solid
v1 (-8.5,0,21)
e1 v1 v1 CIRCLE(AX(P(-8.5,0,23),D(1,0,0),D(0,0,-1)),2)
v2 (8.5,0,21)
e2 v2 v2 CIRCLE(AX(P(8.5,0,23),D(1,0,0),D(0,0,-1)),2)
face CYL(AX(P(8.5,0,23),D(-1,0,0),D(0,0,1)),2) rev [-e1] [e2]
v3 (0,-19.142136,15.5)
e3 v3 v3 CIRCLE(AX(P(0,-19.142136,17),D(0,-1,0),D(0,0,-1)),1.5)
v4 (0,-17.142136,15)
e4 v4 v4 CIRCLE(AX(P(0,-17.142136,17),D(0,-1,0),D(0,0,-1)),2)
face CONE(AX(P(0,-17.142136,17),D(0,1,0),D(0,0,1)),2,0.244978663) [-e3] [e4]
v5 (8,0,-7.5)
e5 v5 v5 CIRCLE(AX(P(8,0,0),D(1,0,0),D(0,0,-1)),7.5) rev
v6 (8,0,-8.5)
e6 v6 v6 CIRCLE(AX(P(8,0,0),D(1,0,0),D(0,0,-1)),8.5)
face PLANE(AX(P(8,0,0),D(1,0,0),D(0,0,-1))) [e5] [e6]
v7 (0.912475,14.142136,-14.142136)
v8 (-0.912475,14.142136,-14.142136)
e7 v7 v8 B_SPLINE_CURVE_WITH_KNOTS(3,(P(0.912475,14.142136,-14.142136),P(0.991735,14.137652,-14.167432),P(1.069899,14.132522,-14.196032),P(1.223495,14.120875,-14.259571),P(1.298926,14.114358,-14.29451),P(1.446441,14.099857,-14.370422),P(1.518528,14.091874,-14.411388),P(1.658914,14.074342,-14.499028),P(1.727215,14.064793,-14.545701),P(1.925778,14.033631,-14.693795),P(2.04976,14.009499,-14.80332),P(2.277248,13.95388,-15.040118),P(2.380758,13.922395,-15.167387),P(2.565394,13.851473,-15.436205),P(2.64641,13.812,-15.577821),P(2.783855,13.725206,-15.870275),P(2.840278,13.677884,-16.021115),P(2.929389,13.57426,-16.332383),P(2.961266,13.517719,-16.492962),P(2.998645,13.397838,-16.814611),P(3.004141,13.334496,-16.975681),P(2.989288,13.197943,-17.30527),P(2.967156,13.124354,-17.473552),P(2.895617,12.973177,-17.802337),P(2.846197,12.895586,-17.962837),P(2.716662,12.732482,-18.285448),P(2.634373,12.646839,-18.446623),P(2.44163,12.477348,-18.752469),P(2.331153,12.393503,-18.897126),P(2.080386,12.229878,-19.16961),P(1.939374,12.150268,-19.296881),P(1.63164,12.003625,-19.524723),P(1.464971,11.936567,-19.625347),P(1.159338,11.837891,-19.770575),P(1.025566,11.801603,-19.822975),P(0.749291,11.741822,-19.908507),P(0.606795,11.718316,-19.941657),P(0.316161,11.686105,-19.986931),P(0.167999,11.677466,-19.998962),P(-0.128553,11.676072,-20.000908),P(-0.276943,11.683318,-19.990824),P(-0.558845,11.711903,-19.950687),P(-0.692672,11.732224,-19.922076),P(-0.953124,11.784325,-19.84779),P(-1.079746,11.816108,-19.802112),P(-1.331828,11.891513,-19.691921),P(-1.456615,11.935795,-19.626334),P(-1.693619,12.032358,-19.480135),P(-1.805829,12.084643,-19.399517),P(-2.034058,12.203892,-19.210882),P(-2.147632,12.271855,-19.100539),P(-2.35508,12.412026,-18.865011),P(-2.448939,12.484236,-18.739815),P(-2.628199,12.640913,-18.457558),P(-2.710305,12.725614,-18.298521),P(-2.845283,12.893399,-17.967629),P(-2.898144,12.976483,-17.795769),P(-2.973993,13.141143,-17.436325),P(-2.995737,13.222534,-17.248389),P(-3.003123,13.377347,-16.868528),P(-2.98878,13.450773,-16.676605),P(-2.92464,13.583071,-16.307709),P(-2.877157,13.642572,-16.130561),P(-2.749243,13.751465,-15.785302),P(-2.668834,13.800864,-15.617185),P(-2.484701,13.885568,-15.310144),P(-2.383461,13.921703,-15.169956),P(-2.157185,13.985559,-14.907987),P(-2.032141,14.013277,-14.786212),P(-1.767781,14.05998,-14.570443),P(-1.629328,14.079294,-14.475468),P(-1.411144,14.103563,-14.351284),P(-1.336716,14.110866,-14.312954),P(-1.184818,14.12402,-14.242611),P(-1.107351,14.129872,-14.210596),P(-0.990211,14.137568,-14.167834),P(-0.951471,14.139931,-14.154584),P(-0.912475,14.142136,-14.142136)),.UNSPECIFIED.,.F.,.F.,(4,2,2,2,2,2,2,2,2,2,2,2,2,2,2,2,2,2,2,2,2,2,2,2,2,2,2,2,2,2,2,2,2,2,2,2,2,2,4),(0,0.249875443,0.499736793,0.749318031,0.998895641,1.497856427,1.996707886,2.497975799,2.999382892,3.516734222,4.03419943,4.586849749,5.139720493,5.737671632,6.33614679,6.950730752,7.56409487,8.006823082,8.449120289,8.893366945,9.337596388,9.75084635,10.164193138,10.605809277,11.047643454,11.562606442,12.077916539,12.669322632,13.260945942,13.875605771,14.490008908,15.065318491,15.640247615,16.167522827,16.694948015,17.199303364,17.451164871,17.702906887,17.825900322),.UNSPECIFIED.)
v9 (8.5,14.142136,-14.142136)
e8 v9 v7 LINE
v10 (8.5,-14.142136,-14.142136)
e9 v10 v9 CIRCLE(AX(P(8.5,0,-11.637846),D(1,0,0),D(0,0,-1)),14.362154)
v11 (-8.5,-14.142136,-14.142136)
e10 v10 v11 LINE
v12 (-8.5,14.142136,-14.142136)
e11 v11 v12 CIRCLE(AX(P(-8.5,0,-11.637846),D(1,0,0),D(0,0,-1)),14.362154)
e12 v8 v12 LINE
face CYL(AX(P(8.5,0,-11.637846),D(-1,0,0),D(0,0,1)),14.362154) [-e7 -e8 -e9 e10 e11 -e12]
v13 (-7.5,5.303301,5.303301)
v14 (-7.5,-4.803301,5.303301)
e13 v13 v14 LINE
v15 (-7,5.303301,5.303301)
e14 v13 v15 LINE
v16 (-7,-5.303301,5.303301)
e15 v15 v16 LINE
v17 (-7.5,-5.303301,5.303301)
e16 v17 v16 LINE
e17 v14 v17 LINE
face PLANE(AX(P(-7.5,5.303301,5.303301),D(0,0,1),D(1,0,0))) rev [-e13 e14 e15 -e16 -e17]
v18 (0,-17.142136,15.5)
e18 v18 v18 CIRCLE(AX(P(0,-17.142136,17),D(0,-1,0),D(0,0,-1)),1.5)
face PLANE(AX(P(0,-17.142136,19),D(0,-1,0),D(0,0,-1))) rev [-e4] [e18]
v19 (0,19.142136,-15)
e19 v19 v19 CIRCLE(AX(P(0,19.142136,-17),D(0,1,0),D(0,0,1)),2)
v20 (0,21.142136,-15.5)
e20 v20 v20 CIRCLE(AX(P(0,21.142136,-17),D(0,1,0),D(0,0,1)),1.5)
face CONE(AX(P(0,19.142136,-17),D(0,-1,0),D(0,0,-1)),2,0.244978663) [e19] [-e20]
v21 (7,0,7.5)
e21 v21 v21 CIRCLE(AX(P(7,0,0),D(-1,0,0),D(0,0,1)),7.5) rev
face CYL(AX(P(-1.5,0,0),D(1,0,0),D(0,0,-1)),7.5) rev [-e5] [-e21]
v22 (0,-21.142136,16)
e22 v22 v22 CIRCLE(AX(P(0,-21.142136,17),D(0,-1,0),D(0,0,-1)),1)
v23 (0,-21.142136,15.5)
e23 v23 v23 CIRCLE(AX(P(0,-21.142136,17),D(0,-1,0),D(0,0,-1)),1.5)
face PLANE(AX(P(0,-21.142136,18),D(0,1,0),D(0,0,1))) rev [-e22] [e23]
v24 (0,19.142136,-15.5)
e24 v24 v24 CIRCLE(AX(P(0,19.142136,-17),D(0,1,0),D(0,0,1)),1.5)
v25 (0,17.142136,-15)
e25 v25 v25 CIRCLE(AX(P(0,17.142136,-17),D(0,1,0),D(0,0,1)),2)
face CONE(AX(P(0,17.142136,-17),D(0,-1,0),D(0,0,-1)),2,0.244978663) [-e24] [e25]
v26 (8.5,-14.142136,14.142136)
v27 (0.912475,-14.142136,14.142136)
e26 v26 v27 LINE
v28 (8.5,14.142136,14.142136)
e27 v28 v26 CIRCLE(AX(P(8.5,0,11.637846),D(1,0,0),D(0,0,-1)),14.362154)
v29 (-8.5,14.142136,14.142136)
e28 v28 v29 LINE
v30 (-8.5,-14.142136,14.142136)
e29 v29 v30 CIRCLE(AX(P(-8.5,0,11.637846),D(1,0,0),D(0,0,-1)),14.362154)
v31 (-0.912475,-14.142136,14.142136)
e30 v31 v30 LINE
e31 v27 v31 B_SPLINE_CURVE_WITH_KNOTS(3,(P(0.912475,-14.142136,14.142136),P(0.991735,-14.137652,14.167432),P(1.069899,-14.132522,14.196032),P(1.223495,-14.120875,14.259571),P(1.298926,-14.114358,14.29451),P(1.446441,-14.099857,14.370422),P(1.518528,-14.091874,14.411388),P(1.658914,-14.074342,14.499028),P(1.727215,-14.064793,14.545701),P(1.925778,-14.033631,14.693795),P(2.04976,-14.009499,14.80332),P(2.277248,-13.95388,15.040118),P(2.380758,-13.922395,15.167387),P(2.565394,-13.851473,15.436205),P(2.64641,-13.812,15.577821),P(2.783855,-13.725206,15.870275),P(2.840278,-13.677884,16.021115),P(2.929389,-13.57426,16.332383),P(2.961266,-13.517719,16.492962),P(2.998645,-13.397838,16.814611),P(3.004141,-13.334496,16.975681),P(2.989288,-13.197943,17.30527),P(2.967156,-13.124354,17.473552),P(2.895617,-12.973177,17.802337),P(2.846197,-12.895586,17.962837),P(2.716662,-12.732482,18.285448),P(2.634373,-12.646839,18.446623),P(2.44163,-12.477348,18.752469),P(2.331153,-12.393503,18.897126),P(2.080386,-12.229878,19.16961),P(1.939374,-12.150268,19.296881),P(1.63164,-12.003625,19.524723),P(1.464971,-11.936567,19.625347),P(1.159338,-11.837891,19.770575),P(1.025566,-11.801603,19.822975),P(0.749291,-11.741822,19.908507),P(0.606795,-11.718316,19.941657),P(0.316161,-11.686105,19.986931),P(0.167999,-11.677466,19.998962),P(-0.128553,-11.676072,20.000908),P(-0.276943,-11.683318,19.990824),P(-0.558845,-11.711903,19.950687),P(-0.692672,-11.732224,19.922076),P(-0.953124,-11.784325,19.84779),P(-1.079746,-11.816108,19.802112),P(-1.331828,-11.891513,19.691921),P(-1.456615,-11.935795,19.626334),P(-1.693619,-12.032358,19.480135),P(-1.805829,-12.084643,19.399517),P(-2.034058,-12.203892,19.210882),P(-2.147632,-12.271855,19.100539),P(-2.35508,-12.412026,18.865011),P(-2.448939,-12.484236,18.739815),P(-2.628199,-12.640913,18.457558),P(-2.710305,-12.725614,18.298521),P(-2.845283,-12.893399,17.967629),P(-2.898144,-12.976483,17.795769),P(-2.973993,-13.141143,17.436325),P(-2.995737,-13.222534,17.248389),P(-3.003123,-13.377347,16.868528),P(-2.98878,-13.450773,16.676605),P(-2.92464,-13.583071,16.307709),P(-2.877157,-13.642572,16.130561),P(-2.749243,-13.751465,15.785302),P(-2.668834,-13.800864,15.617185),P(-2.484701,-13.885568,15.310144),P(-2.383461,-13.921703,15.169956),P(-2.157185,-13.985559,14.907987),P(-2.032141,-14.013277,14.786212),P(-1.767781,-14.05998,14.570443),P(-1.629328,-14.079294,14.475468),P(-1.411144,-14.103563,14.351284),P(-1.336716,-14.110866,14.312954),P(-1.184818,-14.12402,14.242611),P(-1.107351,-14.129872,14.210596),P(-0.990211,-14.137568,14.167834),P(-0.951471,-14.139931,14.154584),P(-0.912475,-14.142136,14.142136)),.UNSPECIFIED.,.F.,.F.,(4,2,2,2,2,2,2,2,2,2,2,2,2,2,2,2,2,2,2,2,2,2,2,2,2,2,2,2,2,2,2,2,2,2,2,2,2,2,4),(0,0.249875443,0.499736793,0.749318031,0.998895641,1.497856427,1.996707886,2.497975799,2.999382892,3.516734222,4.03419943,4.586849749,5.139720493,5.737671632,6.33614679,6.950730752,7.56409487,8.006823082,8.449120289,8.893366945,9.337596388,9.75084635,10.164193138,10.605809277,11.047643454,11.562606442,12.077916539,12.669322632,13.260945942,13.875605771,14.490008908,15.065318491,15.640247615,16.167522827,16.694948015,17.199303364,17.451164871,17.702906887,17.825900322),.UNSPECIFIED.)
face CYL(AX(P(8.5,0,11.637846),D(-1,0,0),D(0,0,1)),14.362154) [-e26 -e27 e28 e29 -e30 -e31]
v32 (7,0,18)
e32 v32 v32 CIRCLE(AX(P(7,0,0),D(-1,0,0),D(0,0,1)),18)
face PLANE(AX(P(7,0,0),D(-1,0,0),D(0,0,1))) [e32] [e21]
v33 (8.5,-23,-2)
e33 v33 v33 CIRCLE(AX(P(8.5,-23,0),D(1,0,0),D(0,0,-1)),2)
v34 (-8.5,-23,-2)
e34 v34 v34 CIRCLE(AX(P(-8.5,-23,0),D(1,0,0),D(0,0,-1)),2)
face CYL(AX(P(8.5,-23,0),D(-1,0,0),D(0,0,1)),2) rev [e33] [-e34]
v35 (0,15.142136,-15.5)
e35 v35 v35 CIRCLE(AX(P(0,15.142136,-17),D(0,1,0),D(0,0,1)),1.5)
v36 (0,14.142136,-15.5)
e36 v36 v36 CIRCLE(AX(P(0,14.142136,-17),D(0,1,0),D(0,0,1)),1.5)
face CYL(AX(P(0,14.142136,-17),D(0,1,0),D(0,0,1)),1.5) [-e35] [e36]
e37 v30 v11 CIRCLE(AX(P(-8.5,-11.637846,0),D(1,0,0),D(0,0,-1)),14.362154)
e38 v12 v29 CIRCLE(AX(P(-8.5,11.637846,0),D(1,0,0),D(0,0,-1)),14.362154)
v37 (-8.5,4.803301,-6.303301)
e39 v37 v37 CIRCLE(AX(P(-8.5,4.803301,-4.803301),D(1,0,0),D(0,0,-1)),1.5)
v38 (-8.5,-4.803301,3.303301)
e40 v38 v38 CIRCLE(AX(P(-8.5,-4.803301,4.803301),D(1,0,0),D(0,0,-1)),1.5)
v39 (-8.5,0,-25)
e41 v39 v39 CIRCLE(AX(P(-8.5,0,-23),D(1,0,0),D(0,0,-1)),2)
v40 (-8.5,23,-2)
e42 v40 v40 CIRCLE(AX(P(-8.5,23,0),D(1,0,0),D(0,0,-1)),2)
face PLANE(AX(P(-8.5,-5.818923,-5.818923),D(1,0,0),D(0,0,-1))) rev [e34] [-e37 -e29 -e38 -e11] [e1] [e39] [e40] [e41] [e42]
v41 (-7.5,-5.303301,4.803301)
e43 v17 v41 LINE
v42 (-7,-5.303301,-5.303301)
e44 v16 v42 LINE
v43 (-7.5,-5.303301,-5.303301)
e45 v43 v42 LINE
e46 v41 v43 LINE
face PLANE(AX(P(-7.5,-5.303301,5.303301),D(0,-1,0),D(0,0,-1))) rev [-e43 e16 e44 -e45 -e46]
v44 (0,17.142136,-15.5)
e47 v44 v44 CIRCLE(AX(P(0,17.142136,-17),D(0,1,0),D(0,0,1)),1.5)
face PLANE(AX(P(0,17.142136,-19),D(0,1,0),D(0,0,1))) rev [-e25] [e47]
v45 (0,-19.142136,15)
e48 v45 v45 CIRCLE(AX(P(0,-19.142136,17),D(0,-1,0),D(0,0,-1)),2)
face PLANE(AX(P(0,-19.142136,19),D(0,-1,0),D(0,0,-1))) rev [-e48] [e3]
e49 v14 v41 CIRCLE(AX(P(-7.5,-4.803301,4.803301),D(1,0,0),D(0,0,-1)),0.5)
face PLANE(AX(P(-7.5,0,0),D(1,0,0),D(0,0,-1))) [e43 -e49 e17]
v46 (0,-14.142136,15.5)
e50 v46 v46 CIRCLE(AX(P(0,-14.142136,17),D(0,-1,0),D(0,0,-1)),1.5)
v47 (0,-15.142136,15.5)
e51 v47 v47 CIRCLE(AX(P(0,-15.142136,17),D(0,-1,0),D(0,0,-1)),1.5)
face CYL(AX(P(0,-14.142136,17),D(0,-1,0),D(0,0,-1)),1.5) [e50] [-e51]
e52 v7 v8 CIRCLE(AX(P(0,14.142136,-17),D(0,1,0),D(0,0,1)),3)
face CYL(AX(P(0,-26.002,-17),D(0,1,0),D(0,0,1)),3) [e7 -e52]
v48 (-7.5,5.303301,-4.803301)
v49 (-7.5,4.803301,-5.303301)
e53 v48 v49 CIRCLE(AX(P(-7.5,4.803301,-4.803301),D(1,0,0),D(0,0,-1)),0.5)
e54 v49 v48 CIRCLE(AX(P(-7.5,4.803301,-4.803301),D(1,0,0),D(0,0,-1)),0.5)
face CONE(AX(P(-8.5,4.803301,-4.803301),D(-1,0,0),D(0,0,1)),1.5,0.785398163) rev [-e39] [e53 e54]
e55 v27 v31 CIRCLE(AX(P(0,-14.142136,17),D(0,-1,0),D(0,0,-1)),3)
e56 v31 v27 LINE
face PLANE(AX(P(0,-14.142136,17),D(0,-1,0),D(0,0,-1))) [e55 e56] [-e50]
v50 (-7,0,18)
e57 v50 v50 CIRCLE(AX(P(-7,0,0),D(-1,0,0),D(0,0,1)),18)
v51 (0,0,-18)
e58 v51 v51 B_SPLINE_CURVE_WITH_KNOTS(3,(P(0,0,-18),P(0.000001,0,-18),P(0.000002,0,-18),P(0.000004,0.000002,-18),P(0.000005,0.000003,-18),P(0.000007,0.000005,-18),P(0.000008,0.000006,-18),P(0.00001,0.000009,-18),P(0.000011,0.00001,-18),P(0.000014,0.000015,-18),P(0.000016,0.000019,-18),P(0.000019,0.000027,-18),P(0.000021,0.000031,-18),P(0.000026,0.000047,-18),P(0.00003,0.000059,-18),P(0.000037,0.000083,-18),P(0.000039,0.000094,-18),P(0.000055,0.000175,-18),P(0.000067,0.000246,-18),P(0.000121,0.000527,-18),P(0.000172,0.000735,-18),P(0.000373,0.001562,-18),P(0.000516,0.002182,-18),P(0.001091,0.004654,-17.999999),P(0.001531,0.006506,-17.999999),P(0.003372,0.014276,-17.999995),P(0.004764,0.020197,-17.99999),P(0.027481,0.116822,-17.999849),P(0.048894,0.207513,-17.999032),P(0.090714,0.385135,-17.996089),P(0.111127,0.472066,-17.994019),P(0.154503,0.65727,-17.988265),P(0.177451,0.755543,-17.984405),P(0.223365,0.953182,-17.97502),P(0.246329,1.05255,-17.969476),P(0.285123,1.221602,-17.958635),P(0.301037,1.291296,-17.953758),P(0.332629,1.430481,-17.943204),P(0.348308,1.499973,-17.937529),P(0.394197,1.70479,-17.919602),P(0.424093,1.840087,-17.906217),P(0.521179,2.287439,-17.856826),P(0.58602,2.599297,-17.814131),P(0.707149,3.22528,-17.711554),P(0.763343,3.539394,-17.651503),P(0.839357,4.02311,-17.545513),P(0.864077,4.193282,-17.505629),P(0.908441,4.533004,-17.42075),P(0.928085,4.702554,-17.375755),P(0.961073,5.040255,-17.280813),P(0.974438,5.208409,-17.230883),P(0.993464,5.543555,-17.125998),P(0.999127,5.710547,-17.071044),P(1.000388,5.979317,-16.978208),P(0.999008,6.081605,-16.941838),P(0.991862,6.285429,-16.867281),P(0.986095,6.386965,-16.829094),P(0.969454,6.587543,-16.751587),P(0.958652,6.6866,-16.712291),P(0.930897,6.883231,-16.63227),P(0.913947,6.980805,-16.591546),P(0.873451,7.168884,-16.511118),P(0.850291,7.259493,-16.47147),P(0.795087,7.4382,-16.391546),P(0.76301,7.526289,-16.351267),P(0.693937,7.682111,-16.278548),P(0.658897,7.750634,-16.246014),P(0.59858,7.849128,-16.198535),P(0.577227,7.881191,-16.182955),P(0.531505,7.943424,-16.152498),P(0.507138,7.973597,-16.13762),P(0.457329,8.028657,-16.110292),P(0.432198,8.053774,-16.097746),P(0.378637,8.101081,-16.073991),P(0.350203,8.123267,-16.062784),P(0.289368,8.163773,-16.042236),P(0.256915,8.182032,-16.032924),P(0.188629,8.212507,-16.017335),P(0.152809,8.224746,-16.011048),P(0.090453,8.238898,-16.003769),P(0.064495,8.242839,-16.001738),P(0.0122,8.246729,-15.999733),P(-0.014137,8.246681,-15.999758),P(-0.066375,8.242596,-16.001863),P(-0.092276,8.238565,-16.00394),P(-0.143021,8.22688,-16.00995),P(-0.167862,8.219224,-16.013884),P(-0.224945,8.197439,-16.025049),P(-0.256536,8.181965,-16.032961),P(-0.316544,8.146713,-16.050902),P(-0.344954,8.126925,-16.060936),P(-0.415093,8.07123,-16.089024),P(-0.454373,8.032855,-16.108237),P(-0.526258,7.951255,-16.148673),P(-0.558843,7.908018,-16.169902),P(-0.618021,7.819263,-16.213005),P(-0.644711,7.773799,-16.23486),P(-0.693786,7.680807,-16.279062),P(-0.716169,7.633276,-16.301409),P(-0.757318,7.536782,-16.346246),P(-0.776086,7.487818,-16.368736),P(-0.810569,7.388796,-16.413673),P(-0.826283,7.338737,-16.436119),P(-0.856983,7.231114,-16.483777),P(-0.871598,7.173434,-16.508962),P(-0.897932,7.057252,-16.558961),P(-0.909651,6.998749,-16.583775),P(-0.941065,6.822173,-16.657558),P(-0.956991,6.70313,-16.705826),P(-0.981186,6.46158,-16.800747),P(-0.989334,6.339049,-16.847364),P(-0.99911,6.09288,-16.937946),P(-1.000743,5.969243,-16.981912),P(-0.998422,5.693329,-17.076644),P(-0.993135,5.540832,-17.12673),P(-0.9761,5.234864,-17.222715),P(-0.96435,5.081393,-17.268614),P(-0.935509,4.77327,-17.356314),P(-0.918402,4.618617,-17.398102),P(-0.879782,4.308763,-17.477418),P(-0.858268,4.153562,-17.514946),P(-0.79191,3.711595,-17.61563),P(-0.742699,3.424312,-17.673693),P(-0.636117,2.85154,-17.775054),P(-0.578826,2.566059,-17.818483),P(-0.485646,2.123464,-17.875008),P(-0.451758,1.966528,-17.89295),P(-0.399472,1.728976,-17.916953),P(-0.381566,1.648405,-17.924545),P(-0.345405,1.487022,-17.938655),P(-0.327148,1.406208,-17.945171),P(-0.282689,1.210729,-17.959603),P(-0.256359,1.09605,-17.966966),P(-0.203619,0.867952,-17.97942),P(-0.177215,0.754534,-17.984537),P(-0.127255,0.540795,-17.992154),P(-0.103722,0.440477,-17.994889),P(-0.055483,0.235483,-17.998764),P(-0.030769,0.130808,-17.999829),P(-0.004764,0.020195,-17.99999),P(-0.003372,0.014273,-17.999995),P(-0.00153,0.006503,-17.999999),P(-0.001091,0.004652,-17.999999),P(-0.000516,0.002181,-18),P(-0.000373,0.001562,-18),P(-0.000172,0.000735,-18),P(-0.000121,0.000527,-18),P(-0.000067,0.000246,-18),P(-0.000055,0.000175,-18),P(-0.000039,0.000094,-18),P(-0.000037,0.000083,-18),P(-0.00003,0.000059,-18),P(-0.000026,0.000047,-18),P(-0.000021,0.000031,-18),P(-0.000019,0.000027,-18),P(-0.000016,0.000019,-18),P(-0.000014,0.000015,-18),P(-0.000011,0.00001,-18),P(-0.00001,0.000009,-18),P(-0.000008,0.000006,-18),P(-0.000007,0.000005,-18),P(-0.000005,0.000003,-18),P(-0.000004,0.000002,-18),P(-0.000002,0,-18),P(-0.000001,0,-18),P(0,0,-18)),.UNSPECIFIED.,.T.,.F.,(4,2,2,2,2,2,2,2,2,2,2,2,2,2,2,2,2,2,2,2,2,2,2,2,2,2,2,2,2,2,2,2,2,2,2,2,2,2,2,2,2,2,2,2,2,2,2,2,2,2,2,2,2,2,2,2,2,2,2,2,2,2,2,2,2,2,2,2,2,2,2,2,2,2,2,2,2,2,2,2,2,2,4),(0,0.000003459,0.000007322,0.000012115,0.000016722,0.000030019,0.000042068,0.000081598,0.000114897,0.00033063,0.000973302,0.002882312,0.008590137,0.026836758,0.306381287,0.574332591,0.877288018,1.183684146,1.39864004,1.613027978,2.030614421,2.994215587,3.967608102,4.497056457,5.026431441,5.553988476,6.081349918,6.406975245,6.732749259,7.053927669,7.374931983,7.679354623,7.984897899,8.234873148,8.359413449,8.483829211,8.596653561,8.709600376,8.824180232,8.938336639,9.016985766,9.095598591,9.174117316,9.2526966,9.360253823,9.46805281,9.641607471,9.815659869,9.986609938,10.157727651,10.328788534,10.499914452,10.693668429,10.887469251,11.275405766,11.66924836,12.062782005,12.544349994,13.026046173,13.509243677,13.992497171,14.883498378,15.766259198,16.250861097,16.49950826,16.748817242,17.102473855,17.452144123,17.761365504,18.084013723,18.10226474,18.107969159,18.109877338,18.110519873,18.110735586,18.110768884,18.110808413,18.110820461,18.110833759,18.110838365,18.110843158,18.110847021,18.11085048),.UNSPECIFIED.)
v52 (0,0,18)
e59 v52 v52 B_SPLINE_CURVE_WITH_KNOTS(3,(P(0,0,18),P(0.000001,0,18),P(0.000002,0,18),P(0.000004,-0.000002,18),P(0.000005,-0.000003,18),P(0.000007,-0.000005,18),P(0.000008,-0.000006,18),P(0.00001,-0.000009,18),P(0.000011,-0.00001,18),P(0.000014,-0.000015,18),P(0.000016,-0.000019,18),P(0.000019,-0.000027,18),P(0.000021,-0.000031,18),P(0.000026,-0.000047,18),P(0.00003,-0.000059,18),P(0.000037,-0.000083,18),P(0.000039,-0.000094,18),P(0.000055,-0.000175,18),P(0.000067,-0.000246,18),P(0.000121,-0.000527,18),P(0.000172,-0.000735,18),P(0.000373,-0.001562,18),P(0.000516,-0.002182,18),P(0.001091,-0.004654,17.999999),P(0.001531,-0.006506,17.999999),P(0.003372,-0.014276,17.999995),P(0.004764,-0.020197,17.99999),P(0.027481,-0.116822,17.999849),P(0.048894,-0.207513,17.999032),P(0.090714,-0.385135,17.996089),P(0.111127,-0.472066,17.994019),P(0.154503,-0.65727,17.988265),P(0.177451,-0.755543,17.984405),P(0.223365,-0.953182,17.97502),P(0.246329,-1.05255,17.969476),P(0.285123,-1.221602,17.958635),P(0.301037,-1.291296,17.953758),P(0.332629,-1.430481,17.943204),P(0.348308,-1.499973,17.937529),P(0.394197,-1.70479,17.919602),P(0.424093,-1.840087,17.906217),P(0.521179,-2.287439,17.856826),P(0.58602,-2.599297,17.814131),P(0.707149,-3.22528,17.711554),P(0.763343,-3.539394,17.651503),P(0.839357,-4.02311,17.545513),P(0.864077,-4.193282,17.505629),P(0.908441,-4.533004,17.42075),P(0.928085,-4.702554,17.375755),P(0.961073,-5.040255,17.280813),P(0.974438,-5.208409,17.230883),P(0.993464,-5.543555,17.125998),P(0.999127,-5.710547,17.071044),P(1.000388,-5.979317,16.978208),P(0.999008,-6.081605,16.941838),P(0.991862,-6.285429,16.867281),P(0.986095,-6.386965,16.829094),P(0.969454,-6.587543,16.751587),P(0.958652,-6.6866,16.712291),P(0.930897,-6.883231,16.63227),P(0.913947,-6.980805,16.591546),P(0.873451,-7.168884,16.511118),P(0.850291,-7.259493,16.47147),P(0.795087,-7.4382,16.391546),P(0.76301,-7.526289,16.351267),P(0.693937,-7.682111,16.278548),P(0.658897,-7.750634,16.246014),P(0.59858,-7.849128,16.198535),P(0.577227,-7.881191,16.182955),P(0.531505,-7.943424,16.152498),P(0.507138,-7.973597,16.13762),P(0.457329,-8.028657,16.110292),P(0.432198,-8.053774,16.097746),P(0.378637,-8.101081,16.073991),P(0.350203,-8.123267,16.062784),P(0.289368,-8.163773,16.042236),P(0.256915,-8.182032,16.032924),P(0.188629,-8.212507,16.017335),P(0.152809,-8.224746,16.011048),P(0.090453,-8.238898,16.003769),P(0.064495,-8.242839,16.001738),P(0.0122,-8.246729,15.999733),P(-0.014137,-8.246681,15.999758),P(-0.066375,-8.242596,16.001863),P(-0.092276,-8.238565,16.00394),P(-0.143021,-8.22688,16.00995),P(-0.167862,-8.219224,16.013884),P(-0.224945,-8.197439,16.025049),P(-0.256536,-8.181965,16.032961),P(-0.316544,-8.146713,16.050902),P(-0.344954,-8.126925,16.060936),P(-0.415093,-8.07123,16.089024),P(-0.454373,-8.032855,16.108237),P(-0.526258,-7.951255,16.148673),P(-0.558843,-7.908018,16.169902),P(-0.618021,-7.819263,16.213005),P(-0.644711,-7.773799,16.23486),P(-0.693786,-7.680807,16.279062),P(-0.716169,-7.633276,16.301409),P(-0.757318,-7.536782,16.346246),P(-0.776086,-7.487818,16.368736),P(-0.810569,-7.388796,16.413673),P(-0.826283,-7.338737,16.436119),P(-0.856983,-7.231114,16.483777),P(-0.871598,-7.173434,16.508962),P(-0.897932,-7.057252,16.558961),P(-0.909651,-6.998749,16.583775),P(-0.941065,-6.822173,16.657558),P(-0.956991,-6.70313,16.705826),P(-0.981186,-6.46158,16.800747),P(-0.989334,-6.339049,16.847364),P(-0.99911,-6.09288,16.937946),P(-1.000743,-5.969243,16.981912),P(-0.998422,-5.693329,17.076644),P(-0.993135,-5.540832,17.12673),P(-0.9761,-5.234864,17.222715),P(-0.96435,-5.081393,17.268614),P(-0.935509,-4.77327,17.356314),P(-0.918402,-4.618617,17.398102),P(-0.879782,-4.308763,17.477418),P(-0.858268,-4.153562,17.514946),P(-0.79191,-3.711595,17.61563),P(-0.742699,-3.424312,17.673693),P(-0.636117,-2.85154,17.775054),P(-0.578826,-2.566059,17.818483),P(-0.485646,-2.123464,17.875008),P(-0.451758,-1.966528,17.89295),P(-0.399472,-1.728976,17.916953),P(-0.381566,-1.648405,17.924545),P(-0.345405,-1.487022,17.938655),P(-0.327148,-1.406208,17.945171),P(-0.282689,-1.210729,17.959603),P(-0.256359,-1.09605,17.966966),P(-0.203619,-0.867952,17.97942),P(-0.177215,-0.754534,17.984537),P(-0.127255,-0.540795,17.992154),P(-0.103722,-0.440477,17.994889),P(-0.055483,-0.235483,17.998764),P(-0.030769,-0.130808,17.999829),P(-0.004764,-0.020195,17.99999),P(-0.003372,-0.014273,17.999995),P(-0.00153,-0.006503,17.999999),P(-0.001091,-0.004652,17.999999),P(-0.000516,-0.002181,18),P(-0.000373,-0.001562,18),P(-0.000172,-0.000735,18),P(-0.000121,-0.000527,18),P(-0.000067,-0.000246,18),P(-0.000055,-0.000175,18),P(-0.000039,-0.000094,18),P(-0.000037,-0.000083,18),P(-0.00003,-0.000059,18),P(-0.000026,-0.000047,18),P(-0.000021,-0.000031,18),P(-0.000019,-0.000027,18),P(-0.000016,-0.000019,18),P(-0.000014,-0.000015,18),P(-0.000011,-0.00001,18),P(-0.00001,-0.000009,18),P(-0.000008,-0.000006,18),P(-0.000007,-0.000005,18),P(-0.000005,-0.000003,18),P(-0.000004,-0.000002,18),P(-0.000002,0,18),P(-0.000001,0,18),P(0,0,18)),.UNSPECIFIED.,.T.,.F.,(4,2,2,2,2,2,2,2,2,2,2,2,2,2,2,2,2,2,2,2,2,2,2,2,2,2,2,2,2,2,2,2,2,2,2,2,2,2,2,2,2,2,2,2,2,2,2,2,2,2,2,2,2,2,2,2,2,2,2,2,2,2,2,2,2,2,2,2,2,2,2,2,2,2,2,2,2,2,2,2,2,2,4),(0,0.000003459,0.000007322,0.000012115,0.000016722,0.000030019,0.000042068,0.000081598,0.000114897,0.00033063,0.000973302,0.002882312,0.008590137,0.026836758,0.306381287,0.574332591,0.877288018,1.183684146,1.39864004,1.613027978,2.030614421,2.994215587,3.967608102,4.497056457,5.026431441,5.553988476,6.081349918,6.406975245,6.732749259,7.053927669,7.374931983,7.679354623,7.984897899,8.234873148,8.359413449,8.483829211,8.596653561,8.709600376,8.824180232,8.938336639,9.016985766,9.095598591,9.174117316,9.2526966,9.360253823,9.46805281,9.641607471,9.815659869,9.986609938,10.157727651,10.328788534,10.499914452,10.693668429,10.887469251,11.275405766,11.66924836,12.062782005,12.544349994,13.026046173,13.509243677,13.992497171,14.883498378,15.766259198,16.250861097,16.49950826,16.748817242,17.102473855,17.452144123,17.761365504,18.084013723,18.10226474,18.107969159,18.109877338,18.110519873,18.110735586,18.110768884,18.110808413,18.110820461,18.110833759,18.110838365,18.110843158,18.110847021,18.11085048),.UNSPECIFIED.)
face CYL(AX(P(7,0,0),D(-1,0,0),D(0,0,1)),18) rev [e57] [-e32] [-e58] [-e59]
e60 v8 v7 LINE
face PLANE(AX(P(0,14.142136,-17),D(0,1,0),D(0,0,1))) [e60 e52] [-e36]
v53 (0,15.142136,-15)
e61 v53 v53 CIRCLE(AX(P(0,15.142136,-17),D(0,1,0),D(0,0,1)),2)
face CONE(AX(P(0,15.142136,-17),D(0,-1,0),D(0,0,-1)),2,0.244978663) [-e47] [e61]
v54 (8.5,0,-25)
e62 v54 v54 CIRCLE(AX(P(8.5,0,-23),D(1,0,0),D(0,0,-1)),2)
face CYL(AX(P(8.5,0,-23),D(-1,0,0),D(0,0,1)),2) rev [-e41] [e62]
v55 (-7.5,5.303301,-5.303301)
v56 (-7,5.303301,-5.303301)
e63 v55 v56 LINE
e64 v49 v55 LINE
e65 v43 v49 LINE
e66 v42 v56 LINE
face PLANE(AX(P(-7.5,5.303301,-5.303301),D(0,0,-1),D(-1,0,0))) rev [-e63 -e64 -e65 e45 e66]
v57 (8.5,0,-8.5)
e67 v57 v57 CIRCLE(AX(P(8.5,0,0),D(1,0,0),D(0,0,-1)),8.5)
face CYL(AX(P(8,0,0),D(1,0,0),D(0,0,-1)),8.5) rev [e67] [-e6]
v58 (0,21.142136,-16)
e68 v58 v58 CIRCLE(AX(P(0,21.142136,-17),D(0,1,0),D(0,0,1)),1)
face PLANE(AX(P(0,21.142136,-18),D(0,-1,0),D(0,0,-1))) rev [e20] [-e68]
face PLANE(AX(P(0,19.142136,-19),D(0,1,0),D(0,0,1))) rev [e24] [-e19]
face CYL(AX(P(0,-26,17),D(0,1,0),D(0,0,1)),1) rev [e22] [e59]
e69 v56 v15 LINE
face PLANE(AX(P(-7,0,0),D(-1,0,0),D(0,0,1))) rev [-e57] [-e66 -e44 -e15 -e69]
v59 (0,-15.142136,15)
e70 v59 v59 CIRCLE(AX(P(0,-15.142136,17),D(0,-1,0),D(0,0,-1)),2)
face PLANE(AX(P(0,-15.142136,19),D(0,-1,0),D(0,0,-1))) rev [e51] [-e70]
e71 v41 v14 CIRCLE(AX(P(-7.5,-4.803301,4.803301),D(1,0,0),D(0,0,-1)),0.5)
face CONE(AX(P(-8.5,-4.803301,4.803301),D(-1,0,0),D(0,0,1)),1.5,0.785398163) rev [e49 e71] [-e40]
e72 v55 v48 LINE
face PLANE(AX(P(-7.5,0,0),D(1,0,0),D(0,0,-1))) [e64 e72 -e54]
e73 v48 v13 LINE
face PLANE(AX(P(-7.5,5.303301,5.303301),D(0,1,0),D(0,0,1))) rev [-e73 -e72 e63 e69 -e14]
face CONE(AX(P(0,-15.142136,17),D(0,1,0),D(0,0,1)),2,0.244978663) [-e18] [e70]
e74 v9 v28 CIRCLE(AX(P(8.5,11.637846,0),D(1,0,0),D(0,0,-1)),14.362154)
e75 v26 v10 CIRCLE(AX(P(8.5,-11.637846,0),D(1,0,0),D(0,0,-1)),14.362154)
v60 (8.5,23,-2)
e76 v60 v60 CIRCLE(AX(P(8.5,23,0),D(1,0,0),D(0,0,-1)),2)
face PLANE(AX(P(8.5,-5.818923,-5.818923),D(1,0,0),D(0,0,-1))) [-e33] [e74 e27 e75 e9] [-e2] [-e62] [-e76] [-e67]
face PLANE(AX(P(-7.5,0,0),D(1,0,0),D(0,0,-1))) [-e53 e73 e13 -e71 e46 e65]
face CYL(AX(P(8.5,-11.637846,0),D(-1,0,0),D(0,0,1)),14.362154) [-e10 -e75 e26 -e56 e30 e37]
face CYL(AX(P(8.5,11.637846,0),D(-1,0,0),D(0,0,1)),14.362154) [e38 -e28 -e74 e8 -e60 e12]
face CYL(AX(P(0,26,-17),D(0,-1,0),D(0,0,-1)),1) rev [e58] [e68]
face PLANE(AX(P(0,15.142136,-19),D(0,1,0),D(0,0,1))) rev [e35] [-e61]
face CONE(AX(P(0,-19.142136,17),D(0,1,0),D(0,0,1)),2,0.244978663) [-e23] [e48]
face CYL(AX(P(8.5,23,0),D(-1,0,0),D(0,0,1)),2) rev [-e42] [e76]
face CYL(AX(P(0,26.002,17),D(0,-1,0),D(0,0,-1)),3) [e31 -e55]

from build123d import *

# Parameters (mm, degrees)
SKETCH2_R           = 2
FLANGE_DEPTH        = 8.5
SKETCH10_R          = 7.5
CUT_EXTRUDE2_DEPTH  = 10
SKETCH3_R           = 8.5
O_RING_SEAT_DEPTH   = 0.5
SKETCH8_R           = 18
CUT_EXTRUDE1_DEPTH  = 7
SKETCH5_R           = 1
OUTLET_DEPTH        = 38.739236876
BOSS_EXTRUDE2_REACH = 50.576
SKETCH6_R           = 3
SKETCH6_R_2         = 1
INLET_COUNT         = 2
SKETCH11_W          = 10.606601718
SKETCH11_H          = 10.606601718
CUT_EXTRUDE3_DEPTH  = 0.5
SKETCH12_R          = 0.5
CUT_EXTRUDE4_DEPTH  = 41.099875416
CHAMFER1_SIZE       = 1


with BuildPart() as part:
    # Sketch2 → Flange (new, symmetric)
    with BuildSketch(Plane(origin=(0, 0, 0), x_dir=(0, 0, -1), z_dir=(1, 0, 0))):
        with BuildLine():
            ThreePointArc((-14.142135624, 14.142135624), (-26, 0), (-14.142135624, -14.142135624))
            ThreePointArc((-14.142135624, -14.142135624), (0, -26), (14.142135624, -14.142135624))
            ThreePointArc((14.142135624, -14.142135624), (26, 0), (14.142135624, 14.142135624))
            ThreePointArc((14.142135624, 14.142135624), (0, 26), (-14.142135624, 14.142135624))
        make_face()
        with Locations((0, 23)):
            Circle(SKETCH2_R, mode=Mode.SUBTRACT)
        with Locations((23, 0)):
            Circle(SKETCH2_R, mode=Mode.SUBTRACT)
        with Locations((0, -23)):
            Circle(SKETCH2_R, mode=Mode.SUBTRACT)
        with Locations((-23, 0)):
            Circle(SKETCH2_R, mode=Mode.SUBTRACT)
    extrude(amount=FLANGE_DEPTH, both=True)

    # Sketch10 → Cut-Extrude2 (cut)
    with BuildSketch(Plane(origin=(8.5, 0, 0), x_dir=(0, 0, -1), z_dir=(1, 0, 0))):
        Circle(SKETCH10_R)
    extrude(amount=-CUT_EXTRUDE2_DEPTH, mode=Mode.SUBTRACT)

    # Sketch3 → O-Ring Seat (cut)
    with BuildSketch(Plane(origin=(8.5, 0, 0), x_dir=(0, 0, -1), z_dir=(1, 0, 0))):
        Circle(SKETCH3_R)
    extrude(amount=-O_RING_SEAT_DEPTH, mode=Mode.SUBTRACT)

    # Sketch8 → Cut-Extrude1 (cut, symmetric)
    with BuildSketch(Plane.ZY):
        Circle(SKETCH8_R)
    extrude(amount=CUT_EXTRUDE1_DEPTH, both=True, mode=Mode.SUBTRACT)

    # Sketch5 → Outlet (cut, through all)
    with BuildSketch(Plane(origin=(0, 0, 0), x_dir=(1, 0, 0), z_dir=(0, 1, 0))):
        with Locations(Location((0, 17, 0), (0, 0, 90))):
            Circle(SKETCH5_R)
    outlet = extrude(amount=OUTLET_DEPTH, mode=Mode.SUBTRACT)

    # Sketch6 → Boss-Extrude2 (add, up to next)
    with BuildSketch(Plane(origin=(0, 14.142135624, 0), x_dir=(1, 0, 0), z_dir=(0, 1, 0)), mode=Mode.PRIVATE) as boss_extrude2_sk1:
        with Locations((0, 17)):
            Circle(SKETCH6_R)
        with Locations(Location((0, 17, 0), (0, 0, 90))):
            Circle(SKETCH6_R_2, mode=Mode.SUBTRACT)
    boss_extrude2_tool1 = extrude(boss_extrude2_sk1.sketch, amount=-BOSS_EXTRUDE2_REACH, mode=Mode.PRIVATE) - part.part
    boss_extrude2 = boss_extrude2_tool1.solids().sort_by_distance((-2.915147, 14.142136, -17))[0]
    add(boss_extrude2)

    # Sketch9 → Revolve1 (revolve)
    with BuildSketch(Plane(origin=(0, 0, 0), x_dir=(0, 0, -1), z_dir=(1, 0, 0)), mode=Mode.PRIVATE) as revolve1_sk:
        Polygon((18, 14.142135624), (18, 21.142135624), (18.5, 21.142135624), (19, 19.142135624), (18.5, 19.142135624), (19, 17.142135624), (18.5, 17.142135624), (19, 15.142135624), (18.5, 15.142135624), (18.5, 14.142135624), align=None)
    revolve1 = revolve(revolve1_sk.sketch.rotate(Axis((0, 14.142135624, -17), (0, -1, 0)), 180), axis=Axis((0, 14.142135624, -17), (0, -1, 0)))

    # Inlet: Outlet, Boss-Extrude2, Revolve1 ×2 about axis
    inlet_axis = Axis((8, 0, 0), (1, 0, 0))
    add([outlet.rotate(inlet_axis, i * 360 / INLET_COUNT) for i in range(1, INLET_COUNT)], mode=Mode.SUBTRACT)
    add([boss_extrude2.rotate(inlet_axis, i * 360 / INLET_COUNT) for i in range(1, INLET_COUNT)])
    add([revolve1.rotate(inlet_axis, i * 360 / INLET_COUNT) for i in range(1, INLET_COUNT)])

    # Sketch11 → Cut-Extrude3 (cut)
    with BuildSketch(Plane(origin=(-7, 0, 0), x_dir=(0, 0, -1), z_dir=(1, 0, 0))):
        Rectangle(SKETCH11_W, SKETCH11_H)
    extrude(amount=-CUT_EXTRUDE3_DEPTH, mode=Mode.SUBTRACT)

    # Sketch12 → Cut-Extrude4 (cut, through all)
    with BuildSketch(Plane(origin=(-7.5, 0, 0), x_dir=(0, 0, -1), z_dir=(1, 0, 0))):
        with Locations((4.803300859, 4.803300859)):
            Circle(SKETCH12_R)
        with Locations((-4.803300859, -4.803300859)):
            Circle(SKETCH12_R)
    extrude(amount=-CUT_EXTRUDE4_DEPTH, mode=Mode.SUBTRACT)

    # Chamfer1
    chamfer1_edges = [part.edges().sort_by_distance(p)[0] for p in [
        (-8.5, 4.803300859, -4.303300859),
        (-8.5, -4.803300859, 5.303300859),
    ]]
    chamfer(chamfer1_edges, length=CHAMFER1_SIZE - 0.0001)  # a hair under: the kernel refuses the full size


solid = part.part
